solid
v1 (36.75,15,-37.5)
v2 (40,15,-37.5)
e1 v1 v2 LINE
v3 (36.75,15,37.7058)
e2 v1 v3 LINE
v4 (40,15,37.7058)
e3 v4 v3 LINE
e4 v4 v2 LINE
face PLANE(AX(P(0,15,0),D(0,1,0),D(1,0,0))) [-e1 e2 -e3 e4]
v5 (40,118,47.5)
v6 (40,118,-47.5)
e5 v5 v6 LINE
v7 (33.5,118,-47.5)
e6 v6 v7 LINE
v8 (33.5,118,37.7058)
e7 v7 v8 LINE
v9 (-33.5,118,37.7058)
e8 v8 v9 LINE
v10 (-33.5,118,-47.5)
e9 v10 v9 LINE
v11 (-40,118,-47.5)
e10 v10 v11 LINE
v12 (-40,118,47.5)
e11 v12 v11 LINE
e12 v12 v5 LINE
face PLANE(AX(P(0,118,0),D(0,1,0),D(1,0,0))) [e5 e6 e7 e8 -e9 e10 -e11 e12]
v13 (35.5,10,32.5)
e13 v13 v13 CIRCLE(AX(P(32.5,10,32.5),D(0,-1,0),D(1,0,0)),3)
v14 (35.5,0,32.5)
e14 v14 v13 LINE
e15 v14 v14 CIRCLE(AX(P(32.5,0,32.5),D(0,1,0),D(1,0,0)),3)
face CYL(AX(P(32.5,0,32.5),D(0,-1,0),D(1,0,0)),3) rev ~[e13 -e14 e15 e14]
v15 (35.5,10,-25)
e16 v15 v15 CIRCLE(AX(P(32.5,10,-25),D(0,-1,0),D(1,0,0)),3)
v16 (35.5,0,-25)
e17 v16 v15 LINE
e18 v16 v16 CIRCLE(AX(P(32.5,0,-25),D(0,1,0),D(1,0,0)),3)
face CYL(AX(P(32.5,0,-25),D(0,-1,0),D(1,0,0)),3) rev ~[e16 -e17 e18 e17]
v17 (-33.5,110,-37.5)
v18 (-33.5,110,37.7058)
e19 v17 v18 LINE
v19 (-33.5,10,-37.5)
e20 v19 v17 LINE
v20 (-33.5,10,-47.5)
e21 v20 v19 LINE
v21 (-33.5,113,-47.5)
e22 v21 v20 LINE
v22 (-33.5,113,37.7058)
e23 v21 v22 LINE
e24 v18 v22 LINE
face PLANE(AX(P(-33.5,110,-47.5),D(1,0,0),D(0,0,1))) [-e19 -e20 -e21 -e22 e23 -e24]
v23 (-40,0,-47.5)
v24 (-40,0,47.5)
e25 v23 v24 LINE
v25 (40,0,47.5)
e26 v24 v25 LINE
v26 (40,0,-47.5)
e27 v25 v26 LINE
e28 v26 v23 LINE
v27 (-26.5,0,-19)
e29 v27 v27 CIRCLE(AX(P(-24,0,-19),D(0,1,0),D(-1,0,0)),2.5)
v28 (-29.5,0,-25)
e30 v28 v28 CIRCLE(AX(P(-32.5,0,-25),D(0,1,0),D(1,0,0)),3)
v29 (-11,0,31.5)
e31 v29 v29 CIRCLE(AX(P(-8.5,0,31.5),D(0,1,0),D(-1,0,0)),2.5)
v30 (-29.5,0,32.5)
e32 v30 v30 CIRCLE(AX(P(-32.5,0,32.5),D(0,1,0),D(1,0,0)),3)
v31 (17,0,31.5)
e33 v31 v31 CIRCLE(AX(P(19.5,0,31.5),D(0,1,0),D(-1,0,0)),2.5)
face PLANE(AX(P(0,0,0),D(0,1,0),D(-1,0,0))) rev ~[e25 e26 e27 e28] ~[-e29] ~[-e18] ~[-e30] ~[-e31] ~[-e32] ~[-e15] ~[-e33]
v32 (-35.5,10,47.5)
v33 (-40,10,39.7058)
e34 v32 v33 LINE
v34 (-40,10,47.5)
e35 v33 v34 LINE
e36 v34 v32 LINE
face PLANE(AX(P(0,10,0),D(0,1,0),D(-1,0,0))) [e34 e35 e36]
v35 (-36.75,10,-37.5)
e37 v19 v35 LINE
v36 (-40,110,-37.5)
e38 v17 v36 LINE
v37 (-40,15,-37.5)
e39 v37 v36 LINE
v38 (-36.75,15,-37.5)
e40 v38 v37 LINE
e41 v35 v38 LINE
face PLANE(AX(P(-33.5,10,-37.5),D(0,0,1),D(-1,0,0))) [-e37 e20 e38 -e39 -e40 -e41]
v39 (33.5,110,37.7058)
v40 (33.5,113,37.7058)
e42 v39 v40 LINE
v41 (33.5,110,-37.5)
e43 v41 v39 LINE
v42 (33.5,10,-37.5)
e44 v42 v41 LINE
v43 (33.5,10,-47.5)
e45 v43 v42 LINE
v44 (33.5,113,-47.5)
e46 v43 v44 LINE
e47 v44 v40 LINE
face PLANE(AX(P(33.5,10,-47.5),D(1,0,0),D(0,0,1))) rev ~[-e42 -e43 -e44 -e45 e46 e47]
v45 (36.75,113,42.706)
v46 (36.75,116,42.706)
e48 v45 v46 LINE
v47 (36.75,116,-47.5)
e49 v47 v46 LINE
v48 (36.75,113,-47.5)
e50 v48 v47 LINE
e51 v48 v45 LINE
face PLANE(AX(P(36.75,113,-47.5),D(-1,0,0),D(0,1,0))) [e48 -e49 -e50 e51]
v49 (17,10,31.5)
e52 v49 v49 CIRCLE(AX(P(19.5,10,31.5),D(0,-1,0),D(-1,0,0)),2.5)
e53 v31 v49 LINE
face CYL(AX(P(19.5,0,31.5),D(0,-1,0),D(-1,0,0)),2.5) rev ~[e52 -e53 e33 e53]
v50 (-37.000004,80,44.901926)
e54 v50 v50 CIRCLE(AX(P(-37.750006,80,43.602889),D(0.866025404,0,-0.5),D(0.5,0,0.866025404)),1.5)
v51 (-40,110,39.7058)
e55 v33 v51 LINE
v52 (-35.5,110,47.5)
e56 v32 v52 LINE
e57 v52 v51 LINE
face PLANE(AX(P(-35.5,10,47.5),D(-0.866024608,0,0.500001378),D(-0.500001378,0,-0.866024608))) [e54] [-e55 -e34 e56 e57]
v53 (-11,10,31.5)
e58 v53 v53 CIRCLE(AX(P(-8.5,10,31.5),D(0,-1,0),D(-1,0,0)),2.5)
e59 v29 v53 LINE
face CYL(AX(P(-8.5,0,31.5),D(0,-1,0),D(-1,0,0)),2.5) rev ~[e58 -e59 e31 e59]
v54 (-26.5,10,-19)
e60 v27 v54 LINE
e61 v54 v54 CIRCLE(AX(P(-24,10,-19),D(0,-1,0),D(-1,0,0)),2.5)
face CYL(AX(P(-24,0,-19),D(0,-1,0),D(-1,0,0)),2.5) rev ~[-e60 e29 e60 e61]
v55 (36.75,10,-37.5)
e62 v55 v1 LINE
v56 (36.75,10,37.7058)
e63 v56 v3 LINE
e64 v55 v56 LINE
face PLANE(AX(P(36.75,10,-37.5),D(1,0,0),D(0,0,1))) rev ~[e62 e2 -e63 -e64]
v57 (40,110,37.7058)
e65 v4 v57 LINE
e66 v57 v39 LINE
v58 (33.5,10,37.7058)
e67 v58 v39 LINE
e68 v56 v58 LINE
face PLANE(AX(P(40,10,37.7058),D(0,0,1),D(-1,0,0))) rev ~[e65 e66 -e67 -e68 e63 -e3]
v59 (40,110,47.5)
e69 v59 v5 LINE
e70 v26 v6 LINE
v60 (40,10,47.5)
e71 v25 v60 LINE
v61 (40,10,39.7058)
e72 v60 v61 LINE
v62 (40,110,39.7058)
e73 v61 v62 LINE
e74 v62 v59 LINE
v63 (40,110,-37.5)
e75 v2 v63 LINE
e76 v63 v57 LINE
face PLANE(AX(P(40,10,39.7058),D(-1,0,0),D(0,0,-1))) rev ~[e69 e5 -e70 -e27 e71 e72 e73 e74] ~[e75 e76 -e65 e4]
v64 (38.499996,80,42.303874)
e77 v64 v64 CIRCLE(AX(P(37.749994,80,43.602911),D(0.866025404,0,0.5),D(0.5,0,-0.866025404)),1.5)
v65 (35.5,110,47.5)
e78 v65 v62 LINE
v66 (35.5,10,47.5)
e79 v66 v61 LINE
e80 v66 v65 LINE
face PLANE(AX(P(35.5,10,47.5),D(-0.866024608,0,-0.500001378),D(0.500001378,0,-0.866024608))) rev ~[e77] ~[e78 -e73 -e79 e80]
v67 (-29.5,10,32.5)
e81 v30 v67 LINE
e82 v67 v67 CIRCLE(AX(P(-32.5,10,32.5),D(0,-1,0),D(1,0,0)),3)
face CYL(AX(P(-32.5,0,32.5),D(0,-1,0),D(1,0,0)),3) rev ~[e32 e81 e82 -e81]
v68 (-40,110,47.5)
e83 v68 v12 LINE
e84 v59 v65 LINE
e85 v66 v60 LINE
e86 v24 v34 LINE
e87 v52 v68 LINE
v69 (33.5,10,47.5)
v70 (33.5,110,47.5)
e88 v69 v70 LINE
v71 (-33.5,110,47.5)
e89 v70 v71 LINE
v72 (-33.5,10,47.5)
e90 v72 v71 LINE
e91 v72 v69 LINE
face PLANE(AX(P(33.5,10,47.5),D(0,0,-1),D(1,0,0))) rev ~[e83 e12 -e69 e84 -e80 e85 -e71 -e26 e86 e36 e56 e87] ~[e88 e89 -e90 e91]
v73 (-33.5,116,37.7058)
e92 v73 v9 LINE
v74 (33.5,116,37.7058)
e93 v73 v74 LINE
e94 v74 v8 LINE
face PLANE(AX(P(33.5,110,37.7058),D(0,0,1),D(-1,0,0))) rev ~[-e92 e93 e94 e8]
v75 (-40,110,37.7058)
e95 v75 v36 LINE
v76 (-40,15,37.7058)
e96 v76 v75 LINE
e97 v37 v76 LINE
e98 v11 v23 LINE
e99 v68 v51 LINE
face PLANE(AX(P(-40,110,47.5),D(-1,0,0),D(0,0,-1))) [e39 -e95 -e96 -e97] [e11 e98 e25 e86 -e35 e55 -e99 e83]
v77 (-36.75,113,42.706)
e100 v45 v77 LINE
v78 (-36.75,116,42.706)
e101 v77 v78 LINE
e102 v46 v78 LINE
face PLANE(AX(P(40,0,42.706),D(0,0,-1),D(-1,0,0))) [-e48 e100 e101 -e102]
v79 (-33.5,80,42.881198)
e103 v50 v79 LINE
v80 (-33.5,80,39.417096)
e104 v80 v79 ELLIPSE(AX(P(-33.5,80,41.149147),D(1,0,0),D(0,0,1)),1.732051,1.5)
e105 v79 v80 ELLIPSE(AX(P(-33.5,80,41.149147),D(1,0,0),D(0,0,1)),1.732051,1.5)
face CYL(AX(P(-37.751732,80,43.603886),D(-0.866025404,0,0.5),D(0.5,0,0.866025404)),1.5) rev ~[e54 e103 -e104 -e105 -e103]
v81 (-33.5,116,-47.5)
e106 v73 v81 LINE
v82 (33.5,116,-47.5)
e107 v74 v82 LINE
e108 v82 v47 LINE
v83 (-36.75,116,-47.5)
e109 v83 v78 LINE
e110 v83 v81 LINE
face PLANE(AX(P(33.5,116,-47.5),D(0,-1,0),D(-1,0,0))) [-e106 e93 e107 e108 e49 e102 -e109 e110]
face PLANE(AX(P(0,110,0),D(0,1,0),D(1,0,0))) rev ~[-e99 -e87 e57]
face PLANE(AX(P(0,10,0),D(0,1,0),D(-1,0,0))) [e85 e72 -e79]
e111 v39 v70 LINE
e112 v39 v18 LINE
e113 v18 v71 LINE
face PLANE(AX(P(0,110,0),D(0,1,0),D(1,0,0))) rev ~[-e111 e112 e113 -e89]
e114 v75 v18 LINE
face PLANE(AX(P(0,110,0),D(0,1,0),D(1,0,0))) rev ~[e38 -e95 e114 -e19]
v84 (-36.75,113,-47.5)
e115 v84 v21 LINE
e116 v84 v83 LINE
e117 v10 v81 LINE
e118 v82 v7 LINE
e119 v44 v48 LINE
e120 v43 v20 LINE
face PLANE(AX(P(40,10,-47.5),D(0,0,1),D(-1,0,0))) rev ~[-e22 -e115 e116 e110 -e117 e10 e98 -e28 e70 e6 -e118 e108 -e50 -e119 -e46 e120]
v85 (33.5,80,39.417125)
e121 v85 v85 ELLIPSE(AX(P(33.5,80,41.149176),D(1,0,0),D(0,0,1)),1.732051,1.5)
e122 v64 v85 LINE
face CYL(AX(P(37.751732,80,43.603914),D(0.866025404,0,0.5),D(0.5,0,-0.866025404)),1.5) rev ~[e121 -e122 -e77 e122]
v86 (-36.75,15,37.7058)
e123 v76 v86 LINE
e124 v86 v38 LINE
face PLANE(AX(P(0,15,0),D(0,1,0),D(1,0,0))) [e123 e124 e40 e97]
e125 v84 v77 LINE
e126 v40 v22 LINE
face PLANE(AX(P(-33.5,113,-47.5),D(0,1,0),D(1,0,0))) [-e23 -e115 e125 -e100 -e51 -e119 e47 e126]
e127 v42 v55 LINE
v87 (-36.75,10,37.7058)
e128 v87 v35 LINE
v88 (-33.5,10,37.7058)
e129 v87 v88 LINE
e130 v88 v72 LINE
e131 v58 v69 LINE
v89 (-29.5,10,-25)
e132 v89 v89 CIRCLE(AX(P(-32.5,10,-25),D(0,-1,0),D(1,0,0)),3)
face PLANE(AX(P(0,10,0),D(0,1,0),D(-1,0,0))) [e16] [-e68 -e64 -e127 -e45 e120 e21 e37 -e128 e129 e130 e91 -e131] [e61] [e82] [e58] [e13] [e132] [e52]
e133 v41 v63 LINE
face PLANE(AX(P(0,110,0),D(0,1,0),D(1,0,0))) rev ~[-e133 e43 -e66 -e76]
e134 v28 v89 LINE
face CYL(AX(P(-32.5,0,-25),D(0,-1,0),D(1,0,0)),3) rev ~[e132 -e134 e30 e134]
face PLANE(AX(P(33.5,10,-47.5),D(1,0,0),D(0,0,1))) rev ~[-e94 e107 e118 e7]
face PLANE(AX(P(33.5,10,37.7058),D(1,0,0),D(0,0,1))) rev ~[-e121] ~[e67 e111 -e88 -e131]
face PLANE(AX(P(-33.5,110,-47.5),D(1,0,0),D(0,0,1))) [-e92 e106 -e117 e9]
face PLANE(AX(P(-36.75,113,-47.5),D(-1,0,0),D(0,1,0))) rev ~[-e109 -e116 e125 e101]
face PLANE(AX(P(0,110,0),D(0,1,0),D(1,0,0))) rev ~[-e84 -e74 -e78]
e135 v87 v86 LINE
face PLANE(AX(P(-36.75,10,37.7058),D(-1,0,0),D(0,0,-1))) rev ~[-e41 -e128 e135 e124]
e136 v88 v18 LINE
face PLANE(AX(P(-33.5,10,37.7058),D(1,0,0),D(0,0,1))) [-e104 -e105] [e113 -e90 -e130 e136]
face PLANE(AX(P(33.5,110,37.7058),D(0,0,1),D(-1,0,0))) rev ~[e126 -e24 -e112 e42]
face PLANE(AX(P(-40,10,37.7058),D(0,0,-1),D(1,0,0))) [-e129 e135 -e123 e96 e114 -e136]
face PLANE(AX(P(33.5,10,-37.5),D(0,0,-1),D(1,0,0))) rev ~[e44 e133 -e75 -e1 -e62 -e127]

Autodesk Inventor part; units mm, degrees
ref_plane "YZ Plane" through (0, 0, 0) normal (1, 0, 0) x (0, 1, 0)
ref_plane "XZ Plane" through (0, 0, 0) normal (0, 1, 0) x (-1, 0, 0)
ref_plane "XY Plane" through (0, 0, 0) normal (0, 0, 1) x (1, 0, 0)
sketch "Sketch1" plane through (0, 0, 0) normal (0, 1, 0) x (-1, 0, 0)
  line L0 (-40, -47.5) -> (40, -47.5)
  line L1 (40, -47.5) -> (40, 47.5)
  line L2 (40, 47.5) -> (-40, 47.5)
  line L3 (-40, 47.5) -> (-40, -47.5)
  line L4 (-40, -47.5) -> (40, 47.5) construction
  line L5 (40, -47.5) -> (-40, 47.5) construction
  line L6 (25.5, 17) -> (28.5, 17)
  line L7 (0, 17.5) -> (0, 19)
  line L8 (0, 0) -> (2.25, 0)
  line L9 (0, 0) -> (0, 17.5)
  line L10 (-27.5, -36.75) -> (-27.5, 38.25)
  line L11 (-27.5, 38.25) -> (28.5, -36.75) construction
  line L12 (28.5, 38.25) -> (-27.5, -36.75) construction
  line L13 (28.5, 38.25) -> (28.5, -36.75)
  line L14 (28.5, 17) -> (28.5, -36.75)
  line L15 (28.5, -36.75) -> (-27.5, -36.75)
  line L16 (0, -31.5) -> (8.5, -31.5)
  line L17 (0, 0) -> (0, -31.5)
  line L18 (0, -31.5) -> (-19.5, -31.5)
  line L19 (-19.5, -31.5) -> (-19.5, -36.75)
  line L20 (-27.5, 38.25) -> (28.5, 38.25)
  line L21 (0, 19) -> (24, 19)
  line L22 (0, 0) -> (0, 31.5)
  line L23 (28.5, -17) -> (28.5, 36.75)
  line L24 (28.5, -38.25) -> (28.5, 36.75)
  line L25 (28.5, -38.25) -> (-27.5, 36.75) construction
  line L26 (-27.5, 36.75) -> (-27.5, -38.25)
  line L27 (-27.5, -38.25) -> (28.5, 36.75) construction
  line L28 (0, 31.5) -> (8.5, 31.5)
  circle A0 centre (8.5, 31.5) radius 2.5
  line L29 (0, 31.5) -> (-19.5, 31.5)
  circle A1 centre (-19.5, 31.5) radius 2.5
  circle A2 centre (-19.5, 31.5) radius 2.5
  line L30 (-19.5, 31.5) -> (-19.5, 36.75)
  line L31 (28.5, 36.75) -> (-27.5, 36.75)
  line L32 (0, 0) -> (0, -17.5)
  line L33 (0, -17.5) -> (0, -19)
  line L34 (25.5, -17) -> (28.5, -17)
  line L35 (0, -19) -> (24, -19)
  line L36 (-27.5, -38.25) -> (28.5, -38.25)
  circle A3 centre (24, -19) radius 2.5
  point P0 (0.5, 0.75)
  point P1 (0.5, -0.75)
  dimension "d0" = 80
  dimension "d1" = 95
  dimension "d5" = 17.5
  dimension "d6" = 8.5
  dimension "d7" = 19.5
  dimension "d8" = 31.5
  dimension "d9" = 24
  dimension "d11" = 2.25
  dimension "d12" = 56
  dimension "d13" = 75
  dimension "d14" = 5.25
  dimension "d15" = 3
ref_plane "Work Plane3" through (0, 10, 0) normal (0, 1, 0) x (1, 0, 0)
sketch "Sketch2" plane through (0, 10, 0) normal (0, 1, 0) x (1, 0, 0)
  line L0 (35.5, -47.5) -> (40, -39.7058)
  line L1 (35.5, -47.5) -> (44.5, -47.5) construction
  line L2 (40, -39.7058) -> (35.5, -39.7058)
  line L3 (35.5, -39.7058) -> (35.5, -47.5)
  line L4 (-40, -47.5) -> (40, -47.5) projected
  line L5 (40, -47.5) -> (40, 47.5) projected
  line L6 (40, -37.7058) -> (33.5, -37.7058)
  line L7 (33.5, -37.7058) -> (33.5, -47.5)
  line L8 (33.5, -47.5) -> (35.5, -47.5)
  line L9 (40, -39.7058) -> (40, -37.7058)
  line L10 (0, -47.5) -> (0, 47.5)
  line L11 (-35.5, -47.5) -> (-40, -39.7058)
  line L12 (-35.5, -47.5) -> (-44.5, -47.5) construction
  line L13 (-40, -39.7058) -> (-35.5, -39.7058)
  line L14 (-35.5, -39.7058) -> (-35.5, -47.5)
  line L15 (-40, -37.7058) -> (-33.5, -37.7058)
  line L16 (-33.5, -37.7058) -> (-33.5, -47.5)
  line L17 (-33.5, -47.5) -> (-35.5, -47.5)
  line L18 (-40, -39.7058) -> (-40, -37.7058)
  line L19 (40, 47.5) -> (-40, 47.5) projected
  line L20 (-40, 47.5) -> (-33.5, 47.5)
  line L21 (-33.5, 47.5) -> (-33.5, 37.5)
  line L22 (-33.5, 37.5) -> (-40, 37.5)
  line L23 (-40, 37.5) -> (-40, 47.5)
  line L24 (40, 47.5) -> (33.5, 47.5)
  line L25 (33.5, 47.5) -> (33.5, 37.5)
  line L26 (33.5, 37.5) -> (40, 37.5)
  line L27 (40, 37.5) -> (40, 47.5)
  point P0 (0, 0)
  dimension "d18" = 9
  dimension "d19" = 60
  dimension "d20" = 2
  dimension "d21" = 9.7942
  dimension "d22" = 6.5
  dimension "d23" = 6.5
  dimension "d24" = 10
  dimension "d25" = 6.5
  dimension "d26" = 10
extrude "Extrusion2" add sketch "Sketch2" along normal blind 100 contours L3 L2 L0 | L4 L7 L6 L5 L2 L3 | L26 L25 L19 L5 | L14 L13 L18 L15 L16 L4 | L11 L13 L14 | L21 L22 L23 L19
ref_plane "Work Plane2" through (0, 10, 0) normal (0, 1, 0) x (1, 0, 0)
sketch "Sketch3" plane through (0, 10, 0) normal (0, 1, 0) x (1, 0, 0)
  line L0 (-40, 37.5) -> (-40, -37.7058) projected
  line L1 (-33.5, 37.5) -> (-40, 37.5) projected
  line L2 (-40, -37.7058) -> (-36.75, -37.7058)
  line L3 (-36.75, -37.7058) -> (-36.75, 37.5)
  line L4 (-36.75, 37.5) -> (-40, 37.5)
  line L5 (-40, 37.5) -> (-40, -37.7058)
  line L6 (33.5, 37.5) -> (40, 37.5) projected
  line L7 (40, -37.7058) -> (33.5, -37.7058) projected
  line L8 (40, 37.5) -> (36.75, 37.5)
  line L9 (36.75, 37.5) -> (36.75, -37.7058)
  line L10 (36.75, -37.7058) -> (40, -37.7058)
  line L11 (40, -37.7058) -> (40, 37.5)
  point P0 (0, 0)
extrude "Extrusion3" add sketch "Sketch3" along normal blind 5
ref_plane "Work Plane4" through (0, 110, 0) normal (0, 1, 0) x (1, 0, 0)
sketch "Sketch4" plane through (0, 110, 0) normal (0, 1, 0) x (1, 0, 0)
  line L0 (-33.5, 47.5) -> (-40, 47.5) projected
  line L1 (-40, -47.5) -> (40, -47.5) projected
  line L2 (-40, 47.5) -> (-33.5, 47.5)
  line L3 (-33.5, 47.5) -> (-33.5, -47.5)
  line L4 (-33.5, -47.5) -> (-40, -47.5)
  line L5 (-40, -47.5) -> (-40, 47.5)
  line L6 (40, 37.5) -> (40, 47.5) projected
  line L7 (40, 47.5) -> (33.5, 47.5)
  line L8 (33.5, 47.5) -> (33.5, -47.5)
  line L9 (33.5, -47.5) -> (40, -47.5)
  line L10 (40, -47.5) -> (40, 47.5)
  line L11 (40, -37.7058) -> (33.5, -37.7058) projected
  line L12 (33.5, -37.7058) -> (-33.5, -37.7058)
  line L13 (-33.5, -37.7058) -> (-33.5, -47.5)
  line L14 (-33.5, -47.5) -> (33.5, -47.5)
  line L15 (33.5, -47.5) -> (33.5, -37.7058)
  point P0 (0, 0)
extrude "Extrusion4" add sketch "Sketch4" along normal blind 8
ref_plane "Work Plane8" through (40, 0, -47.5) normal (0, 0, -1) x (-1, 0, 0)
sketch "Sketch5" plane through (40, 0, -47.5) normal (0, 0, -1) x (-1, 0, 0)
  line L0 (73.5, 110) -> (6.5, 110) projected
  line L1 (6.5, 110) -> (6.5, 113)
  line L2 (6.5, 10) -> (6.5, 118) projected
  line L3 (6.5, 113) -> (3.25, 113)
  line L4 (3.25, 113) -> (3.25, 116)
  line L5 (3.25, 116) -> (6.5, 116)
  line L6 (6.5, 116) -> (6.5, 113)
  line L7 (73.5, 10) -> (73.5, 118) projected
  line L8 (6.5, 116) -> (73.5, 116)
  line L9 (73.5, 116) -> (73.5, 113)
  line L10 (73.5, 113) -> (6.5, 113)
  line L11 (6.5, 113) -> (6.5, 116)
  line L12 (73.5, 113) -> (76.75, 113)
  line L13 (76.75, 113) -> (76.75, 116)
  line L14 (76.75, 116) -> (73.5, 116)
  line L15 (73.5, 116) -> (73.5, 113)
  point P0 (40, 0)
  dimension "d33" = 3
  dimension "d34" = 3
  dimension "d35" = 3.25
  dimension "d36" = 3.25
extrude "Extrusion5" cut sketch "Sketch5" against normal blind 90.206 contours L10 L2 L8 L7 | L7 L14 L13 L12 | L3 L4 L5 L2
ref_plane "Work Plane7" through (40, 10, 39.7058) normal (0.8660254, 0, 0.5) x (0.5, 0, -0.8660254)
sketch "Sketch6" plane through (40, 10, 39.7058) normal (0.8660254, 0, 0.5) x (0.5, 0, -0.8660254)
  line L0 (-9, 0) -> (-9, 100) projected
  line L1 (0, 0) -> (-9, 0) projected
  line L2 (-9, 100) -> (0, 100)
  line L3 (0, 100) -> (0, 0)
  line L4 (0, 0) -> (-9, 0)
  line L5 (-9, 0) -> (-9, 100)
  line L6 (0, 100) -> (0, 70)
  line L7 (0, 0) -> (0, 100) projected
  line L8 (0, 70) -> (-4.5, 70)
  circle A0 centre (-4.5, 70) radius 1.5
  point P0 (14.3862, -10)
  dimension "d39" = 30
  dimension "d40" = 3
extrude "Extrusion6" cut sketch "Sketch6" against normal blind 6 contours A0
ref_plane "Work Plane6" through (-35.5, 10, 47.5) normal (-0.8660254, 0, 0.5) x (0.5, 0, 0.8660254)
sketch "Sketch7" plane through (-35.5, 10, 47.5) normal (-0.8660254, 0, 0.5) x (0.5, 0, 0.8660254)
  line L0 (-9, 0) -> (-9, 100) projected
  line L1 (0, 0) -> (0, 100) projected
  line L2 (-9, 100) -> (0, 100)
  line L3 (0, 100) -> (0, 0)
  line L4 (0, 0) -> (-9, 0)
  line L5 (-9, 0) -> (-9, 100)
  line L6 (-9, 100) -> (-9, 70)
  line L7 (-9, 70) -> (-4.5, 70)
  circle A0 centre (-4.5, 70) radius 1.5
  point P0 (-23.3862, -10)
  dimension "d43" = 30
  dimension "d44" = 3
extrude "Extrusion7" cut sketch "Sketch7" against normal blind 6 contours A0
ref_plane "Work Plane5" through (40, 0, 47.5) normal (1, 0, 0) x (0, 0, -1)
sketch "Sketch8" plane through (40, 0, 47.5) normal (1, 0, 0) x (0, 0, -1)
  line L0 (85, 110) -> (9.7942, 110) projected
  line L1 (85, 110) -> (95, 110)
  line L2 (95, 110) -> (95, 80)
  line L3 (95, 80) -> (85, 80)
  line L4 (85, 80) -> (85, 110)
  circle A0 centre (90, 80) radius 1.5
  point P0 (47.5, 0)
  dimension "d47" = 10
  dimension "d48" = 30
  dimension "d49" = 3
extrude "Extrusion8" [suppressed]
ref_plane "Work Plane1" through (0, 0, 0) normal (0, -1, 0) x (1, 0, 0)
sketch "Sketch9" plane through (0, 0, 0) normal (0, -1, 0) x (1, 0, 0)
  line L0 (40, 47.5) -> (40, 39.7058) projected
  line L1 (40, 47.5) -> (25, 47.5)
  line L2 (25, 47.5) -> (25, -10)
  line L3 (25, -10) -> (40, -10)
  line L4 (40, -10) -> (40, 47.5)
  line L5 (-40, 47.5) -> (-35.5, 47.5) projected
  line L6 (-40, 47.5) -> (-25, 47.5)
  line L7 (-25, 47.5) -> (-25, -10)
  line L8 (-25, -10) -> (-40, -10)
  line L9 (-40, -10) -> (-40, 47.5)
  line L10 (-40, 47.5) -> (40, 47.5) projected
  line L11 (-40, 47.5) -> (-32.5, 47.5)
  line L12 (-33.5, 47.5) -> (-33.5, 37.7058) projected
  line L13 (-40, 47.5) -> (-33.5, 47.5)
  line L14 (-33.5, 47.5) -> (-29, 47.5)
  line L15 (-40, 47.5) -> (-32.5, 47.5)
  line L16 (-32.5, 47.5) -> (-32.5, 32.5)
  circle A0 centre (-32.5, 32.5) radius 3
  line L17 (-32.5, -10) -> (-32.5, -25)
  circle A1 centre (-32.5, -25) radius 3
  line L18 (32.5, 47.5) -> (32.5, 32.5)
  line L19 (32.5, -10) -> (32.5, -25)
  circle A2 centre (32.5, -25) radius 3
  circle A3 centre (32.5, 32.5) radius 3
  point P0 (0, 0)
  dimension "d52" = 15
  dimension "d53" = 57.5
  dimension "d54" = 15
  dimension "d55" = 57.5
  dimension "d61" = 7.5
  dimension "d62" = 15
  dimension "d63" = 6
  dimension "d64" = 15
  dimension "d65" = 6
  dimension "d66" = 15
  dimension "d67" = 15
  dimension "d68" = 6
  dimension "d69" = 6
extrude "Extrusion9" add sketch "Sketch1" along normal blind 10 contours L3 L2 L1 L0 | L9 L17 L18 L19 L15 L10 L31 L30 A1 L29 L22 L7 | L7 L22 L29 A1 L30 L31 L13 L34 A3 L35 L17 L9 | L35 A3 L34 L13 L15 L19 L18 L17 | L31 L10 L20 L13 | L15 L24 L36 L26
extrude "Extrusion11" cut sketch "Sketch9" against normal up to surface (10 mm away) contours A0 | A1 | A2 | A3
equation "\"d72\" = d68"
properties part number "Base"
